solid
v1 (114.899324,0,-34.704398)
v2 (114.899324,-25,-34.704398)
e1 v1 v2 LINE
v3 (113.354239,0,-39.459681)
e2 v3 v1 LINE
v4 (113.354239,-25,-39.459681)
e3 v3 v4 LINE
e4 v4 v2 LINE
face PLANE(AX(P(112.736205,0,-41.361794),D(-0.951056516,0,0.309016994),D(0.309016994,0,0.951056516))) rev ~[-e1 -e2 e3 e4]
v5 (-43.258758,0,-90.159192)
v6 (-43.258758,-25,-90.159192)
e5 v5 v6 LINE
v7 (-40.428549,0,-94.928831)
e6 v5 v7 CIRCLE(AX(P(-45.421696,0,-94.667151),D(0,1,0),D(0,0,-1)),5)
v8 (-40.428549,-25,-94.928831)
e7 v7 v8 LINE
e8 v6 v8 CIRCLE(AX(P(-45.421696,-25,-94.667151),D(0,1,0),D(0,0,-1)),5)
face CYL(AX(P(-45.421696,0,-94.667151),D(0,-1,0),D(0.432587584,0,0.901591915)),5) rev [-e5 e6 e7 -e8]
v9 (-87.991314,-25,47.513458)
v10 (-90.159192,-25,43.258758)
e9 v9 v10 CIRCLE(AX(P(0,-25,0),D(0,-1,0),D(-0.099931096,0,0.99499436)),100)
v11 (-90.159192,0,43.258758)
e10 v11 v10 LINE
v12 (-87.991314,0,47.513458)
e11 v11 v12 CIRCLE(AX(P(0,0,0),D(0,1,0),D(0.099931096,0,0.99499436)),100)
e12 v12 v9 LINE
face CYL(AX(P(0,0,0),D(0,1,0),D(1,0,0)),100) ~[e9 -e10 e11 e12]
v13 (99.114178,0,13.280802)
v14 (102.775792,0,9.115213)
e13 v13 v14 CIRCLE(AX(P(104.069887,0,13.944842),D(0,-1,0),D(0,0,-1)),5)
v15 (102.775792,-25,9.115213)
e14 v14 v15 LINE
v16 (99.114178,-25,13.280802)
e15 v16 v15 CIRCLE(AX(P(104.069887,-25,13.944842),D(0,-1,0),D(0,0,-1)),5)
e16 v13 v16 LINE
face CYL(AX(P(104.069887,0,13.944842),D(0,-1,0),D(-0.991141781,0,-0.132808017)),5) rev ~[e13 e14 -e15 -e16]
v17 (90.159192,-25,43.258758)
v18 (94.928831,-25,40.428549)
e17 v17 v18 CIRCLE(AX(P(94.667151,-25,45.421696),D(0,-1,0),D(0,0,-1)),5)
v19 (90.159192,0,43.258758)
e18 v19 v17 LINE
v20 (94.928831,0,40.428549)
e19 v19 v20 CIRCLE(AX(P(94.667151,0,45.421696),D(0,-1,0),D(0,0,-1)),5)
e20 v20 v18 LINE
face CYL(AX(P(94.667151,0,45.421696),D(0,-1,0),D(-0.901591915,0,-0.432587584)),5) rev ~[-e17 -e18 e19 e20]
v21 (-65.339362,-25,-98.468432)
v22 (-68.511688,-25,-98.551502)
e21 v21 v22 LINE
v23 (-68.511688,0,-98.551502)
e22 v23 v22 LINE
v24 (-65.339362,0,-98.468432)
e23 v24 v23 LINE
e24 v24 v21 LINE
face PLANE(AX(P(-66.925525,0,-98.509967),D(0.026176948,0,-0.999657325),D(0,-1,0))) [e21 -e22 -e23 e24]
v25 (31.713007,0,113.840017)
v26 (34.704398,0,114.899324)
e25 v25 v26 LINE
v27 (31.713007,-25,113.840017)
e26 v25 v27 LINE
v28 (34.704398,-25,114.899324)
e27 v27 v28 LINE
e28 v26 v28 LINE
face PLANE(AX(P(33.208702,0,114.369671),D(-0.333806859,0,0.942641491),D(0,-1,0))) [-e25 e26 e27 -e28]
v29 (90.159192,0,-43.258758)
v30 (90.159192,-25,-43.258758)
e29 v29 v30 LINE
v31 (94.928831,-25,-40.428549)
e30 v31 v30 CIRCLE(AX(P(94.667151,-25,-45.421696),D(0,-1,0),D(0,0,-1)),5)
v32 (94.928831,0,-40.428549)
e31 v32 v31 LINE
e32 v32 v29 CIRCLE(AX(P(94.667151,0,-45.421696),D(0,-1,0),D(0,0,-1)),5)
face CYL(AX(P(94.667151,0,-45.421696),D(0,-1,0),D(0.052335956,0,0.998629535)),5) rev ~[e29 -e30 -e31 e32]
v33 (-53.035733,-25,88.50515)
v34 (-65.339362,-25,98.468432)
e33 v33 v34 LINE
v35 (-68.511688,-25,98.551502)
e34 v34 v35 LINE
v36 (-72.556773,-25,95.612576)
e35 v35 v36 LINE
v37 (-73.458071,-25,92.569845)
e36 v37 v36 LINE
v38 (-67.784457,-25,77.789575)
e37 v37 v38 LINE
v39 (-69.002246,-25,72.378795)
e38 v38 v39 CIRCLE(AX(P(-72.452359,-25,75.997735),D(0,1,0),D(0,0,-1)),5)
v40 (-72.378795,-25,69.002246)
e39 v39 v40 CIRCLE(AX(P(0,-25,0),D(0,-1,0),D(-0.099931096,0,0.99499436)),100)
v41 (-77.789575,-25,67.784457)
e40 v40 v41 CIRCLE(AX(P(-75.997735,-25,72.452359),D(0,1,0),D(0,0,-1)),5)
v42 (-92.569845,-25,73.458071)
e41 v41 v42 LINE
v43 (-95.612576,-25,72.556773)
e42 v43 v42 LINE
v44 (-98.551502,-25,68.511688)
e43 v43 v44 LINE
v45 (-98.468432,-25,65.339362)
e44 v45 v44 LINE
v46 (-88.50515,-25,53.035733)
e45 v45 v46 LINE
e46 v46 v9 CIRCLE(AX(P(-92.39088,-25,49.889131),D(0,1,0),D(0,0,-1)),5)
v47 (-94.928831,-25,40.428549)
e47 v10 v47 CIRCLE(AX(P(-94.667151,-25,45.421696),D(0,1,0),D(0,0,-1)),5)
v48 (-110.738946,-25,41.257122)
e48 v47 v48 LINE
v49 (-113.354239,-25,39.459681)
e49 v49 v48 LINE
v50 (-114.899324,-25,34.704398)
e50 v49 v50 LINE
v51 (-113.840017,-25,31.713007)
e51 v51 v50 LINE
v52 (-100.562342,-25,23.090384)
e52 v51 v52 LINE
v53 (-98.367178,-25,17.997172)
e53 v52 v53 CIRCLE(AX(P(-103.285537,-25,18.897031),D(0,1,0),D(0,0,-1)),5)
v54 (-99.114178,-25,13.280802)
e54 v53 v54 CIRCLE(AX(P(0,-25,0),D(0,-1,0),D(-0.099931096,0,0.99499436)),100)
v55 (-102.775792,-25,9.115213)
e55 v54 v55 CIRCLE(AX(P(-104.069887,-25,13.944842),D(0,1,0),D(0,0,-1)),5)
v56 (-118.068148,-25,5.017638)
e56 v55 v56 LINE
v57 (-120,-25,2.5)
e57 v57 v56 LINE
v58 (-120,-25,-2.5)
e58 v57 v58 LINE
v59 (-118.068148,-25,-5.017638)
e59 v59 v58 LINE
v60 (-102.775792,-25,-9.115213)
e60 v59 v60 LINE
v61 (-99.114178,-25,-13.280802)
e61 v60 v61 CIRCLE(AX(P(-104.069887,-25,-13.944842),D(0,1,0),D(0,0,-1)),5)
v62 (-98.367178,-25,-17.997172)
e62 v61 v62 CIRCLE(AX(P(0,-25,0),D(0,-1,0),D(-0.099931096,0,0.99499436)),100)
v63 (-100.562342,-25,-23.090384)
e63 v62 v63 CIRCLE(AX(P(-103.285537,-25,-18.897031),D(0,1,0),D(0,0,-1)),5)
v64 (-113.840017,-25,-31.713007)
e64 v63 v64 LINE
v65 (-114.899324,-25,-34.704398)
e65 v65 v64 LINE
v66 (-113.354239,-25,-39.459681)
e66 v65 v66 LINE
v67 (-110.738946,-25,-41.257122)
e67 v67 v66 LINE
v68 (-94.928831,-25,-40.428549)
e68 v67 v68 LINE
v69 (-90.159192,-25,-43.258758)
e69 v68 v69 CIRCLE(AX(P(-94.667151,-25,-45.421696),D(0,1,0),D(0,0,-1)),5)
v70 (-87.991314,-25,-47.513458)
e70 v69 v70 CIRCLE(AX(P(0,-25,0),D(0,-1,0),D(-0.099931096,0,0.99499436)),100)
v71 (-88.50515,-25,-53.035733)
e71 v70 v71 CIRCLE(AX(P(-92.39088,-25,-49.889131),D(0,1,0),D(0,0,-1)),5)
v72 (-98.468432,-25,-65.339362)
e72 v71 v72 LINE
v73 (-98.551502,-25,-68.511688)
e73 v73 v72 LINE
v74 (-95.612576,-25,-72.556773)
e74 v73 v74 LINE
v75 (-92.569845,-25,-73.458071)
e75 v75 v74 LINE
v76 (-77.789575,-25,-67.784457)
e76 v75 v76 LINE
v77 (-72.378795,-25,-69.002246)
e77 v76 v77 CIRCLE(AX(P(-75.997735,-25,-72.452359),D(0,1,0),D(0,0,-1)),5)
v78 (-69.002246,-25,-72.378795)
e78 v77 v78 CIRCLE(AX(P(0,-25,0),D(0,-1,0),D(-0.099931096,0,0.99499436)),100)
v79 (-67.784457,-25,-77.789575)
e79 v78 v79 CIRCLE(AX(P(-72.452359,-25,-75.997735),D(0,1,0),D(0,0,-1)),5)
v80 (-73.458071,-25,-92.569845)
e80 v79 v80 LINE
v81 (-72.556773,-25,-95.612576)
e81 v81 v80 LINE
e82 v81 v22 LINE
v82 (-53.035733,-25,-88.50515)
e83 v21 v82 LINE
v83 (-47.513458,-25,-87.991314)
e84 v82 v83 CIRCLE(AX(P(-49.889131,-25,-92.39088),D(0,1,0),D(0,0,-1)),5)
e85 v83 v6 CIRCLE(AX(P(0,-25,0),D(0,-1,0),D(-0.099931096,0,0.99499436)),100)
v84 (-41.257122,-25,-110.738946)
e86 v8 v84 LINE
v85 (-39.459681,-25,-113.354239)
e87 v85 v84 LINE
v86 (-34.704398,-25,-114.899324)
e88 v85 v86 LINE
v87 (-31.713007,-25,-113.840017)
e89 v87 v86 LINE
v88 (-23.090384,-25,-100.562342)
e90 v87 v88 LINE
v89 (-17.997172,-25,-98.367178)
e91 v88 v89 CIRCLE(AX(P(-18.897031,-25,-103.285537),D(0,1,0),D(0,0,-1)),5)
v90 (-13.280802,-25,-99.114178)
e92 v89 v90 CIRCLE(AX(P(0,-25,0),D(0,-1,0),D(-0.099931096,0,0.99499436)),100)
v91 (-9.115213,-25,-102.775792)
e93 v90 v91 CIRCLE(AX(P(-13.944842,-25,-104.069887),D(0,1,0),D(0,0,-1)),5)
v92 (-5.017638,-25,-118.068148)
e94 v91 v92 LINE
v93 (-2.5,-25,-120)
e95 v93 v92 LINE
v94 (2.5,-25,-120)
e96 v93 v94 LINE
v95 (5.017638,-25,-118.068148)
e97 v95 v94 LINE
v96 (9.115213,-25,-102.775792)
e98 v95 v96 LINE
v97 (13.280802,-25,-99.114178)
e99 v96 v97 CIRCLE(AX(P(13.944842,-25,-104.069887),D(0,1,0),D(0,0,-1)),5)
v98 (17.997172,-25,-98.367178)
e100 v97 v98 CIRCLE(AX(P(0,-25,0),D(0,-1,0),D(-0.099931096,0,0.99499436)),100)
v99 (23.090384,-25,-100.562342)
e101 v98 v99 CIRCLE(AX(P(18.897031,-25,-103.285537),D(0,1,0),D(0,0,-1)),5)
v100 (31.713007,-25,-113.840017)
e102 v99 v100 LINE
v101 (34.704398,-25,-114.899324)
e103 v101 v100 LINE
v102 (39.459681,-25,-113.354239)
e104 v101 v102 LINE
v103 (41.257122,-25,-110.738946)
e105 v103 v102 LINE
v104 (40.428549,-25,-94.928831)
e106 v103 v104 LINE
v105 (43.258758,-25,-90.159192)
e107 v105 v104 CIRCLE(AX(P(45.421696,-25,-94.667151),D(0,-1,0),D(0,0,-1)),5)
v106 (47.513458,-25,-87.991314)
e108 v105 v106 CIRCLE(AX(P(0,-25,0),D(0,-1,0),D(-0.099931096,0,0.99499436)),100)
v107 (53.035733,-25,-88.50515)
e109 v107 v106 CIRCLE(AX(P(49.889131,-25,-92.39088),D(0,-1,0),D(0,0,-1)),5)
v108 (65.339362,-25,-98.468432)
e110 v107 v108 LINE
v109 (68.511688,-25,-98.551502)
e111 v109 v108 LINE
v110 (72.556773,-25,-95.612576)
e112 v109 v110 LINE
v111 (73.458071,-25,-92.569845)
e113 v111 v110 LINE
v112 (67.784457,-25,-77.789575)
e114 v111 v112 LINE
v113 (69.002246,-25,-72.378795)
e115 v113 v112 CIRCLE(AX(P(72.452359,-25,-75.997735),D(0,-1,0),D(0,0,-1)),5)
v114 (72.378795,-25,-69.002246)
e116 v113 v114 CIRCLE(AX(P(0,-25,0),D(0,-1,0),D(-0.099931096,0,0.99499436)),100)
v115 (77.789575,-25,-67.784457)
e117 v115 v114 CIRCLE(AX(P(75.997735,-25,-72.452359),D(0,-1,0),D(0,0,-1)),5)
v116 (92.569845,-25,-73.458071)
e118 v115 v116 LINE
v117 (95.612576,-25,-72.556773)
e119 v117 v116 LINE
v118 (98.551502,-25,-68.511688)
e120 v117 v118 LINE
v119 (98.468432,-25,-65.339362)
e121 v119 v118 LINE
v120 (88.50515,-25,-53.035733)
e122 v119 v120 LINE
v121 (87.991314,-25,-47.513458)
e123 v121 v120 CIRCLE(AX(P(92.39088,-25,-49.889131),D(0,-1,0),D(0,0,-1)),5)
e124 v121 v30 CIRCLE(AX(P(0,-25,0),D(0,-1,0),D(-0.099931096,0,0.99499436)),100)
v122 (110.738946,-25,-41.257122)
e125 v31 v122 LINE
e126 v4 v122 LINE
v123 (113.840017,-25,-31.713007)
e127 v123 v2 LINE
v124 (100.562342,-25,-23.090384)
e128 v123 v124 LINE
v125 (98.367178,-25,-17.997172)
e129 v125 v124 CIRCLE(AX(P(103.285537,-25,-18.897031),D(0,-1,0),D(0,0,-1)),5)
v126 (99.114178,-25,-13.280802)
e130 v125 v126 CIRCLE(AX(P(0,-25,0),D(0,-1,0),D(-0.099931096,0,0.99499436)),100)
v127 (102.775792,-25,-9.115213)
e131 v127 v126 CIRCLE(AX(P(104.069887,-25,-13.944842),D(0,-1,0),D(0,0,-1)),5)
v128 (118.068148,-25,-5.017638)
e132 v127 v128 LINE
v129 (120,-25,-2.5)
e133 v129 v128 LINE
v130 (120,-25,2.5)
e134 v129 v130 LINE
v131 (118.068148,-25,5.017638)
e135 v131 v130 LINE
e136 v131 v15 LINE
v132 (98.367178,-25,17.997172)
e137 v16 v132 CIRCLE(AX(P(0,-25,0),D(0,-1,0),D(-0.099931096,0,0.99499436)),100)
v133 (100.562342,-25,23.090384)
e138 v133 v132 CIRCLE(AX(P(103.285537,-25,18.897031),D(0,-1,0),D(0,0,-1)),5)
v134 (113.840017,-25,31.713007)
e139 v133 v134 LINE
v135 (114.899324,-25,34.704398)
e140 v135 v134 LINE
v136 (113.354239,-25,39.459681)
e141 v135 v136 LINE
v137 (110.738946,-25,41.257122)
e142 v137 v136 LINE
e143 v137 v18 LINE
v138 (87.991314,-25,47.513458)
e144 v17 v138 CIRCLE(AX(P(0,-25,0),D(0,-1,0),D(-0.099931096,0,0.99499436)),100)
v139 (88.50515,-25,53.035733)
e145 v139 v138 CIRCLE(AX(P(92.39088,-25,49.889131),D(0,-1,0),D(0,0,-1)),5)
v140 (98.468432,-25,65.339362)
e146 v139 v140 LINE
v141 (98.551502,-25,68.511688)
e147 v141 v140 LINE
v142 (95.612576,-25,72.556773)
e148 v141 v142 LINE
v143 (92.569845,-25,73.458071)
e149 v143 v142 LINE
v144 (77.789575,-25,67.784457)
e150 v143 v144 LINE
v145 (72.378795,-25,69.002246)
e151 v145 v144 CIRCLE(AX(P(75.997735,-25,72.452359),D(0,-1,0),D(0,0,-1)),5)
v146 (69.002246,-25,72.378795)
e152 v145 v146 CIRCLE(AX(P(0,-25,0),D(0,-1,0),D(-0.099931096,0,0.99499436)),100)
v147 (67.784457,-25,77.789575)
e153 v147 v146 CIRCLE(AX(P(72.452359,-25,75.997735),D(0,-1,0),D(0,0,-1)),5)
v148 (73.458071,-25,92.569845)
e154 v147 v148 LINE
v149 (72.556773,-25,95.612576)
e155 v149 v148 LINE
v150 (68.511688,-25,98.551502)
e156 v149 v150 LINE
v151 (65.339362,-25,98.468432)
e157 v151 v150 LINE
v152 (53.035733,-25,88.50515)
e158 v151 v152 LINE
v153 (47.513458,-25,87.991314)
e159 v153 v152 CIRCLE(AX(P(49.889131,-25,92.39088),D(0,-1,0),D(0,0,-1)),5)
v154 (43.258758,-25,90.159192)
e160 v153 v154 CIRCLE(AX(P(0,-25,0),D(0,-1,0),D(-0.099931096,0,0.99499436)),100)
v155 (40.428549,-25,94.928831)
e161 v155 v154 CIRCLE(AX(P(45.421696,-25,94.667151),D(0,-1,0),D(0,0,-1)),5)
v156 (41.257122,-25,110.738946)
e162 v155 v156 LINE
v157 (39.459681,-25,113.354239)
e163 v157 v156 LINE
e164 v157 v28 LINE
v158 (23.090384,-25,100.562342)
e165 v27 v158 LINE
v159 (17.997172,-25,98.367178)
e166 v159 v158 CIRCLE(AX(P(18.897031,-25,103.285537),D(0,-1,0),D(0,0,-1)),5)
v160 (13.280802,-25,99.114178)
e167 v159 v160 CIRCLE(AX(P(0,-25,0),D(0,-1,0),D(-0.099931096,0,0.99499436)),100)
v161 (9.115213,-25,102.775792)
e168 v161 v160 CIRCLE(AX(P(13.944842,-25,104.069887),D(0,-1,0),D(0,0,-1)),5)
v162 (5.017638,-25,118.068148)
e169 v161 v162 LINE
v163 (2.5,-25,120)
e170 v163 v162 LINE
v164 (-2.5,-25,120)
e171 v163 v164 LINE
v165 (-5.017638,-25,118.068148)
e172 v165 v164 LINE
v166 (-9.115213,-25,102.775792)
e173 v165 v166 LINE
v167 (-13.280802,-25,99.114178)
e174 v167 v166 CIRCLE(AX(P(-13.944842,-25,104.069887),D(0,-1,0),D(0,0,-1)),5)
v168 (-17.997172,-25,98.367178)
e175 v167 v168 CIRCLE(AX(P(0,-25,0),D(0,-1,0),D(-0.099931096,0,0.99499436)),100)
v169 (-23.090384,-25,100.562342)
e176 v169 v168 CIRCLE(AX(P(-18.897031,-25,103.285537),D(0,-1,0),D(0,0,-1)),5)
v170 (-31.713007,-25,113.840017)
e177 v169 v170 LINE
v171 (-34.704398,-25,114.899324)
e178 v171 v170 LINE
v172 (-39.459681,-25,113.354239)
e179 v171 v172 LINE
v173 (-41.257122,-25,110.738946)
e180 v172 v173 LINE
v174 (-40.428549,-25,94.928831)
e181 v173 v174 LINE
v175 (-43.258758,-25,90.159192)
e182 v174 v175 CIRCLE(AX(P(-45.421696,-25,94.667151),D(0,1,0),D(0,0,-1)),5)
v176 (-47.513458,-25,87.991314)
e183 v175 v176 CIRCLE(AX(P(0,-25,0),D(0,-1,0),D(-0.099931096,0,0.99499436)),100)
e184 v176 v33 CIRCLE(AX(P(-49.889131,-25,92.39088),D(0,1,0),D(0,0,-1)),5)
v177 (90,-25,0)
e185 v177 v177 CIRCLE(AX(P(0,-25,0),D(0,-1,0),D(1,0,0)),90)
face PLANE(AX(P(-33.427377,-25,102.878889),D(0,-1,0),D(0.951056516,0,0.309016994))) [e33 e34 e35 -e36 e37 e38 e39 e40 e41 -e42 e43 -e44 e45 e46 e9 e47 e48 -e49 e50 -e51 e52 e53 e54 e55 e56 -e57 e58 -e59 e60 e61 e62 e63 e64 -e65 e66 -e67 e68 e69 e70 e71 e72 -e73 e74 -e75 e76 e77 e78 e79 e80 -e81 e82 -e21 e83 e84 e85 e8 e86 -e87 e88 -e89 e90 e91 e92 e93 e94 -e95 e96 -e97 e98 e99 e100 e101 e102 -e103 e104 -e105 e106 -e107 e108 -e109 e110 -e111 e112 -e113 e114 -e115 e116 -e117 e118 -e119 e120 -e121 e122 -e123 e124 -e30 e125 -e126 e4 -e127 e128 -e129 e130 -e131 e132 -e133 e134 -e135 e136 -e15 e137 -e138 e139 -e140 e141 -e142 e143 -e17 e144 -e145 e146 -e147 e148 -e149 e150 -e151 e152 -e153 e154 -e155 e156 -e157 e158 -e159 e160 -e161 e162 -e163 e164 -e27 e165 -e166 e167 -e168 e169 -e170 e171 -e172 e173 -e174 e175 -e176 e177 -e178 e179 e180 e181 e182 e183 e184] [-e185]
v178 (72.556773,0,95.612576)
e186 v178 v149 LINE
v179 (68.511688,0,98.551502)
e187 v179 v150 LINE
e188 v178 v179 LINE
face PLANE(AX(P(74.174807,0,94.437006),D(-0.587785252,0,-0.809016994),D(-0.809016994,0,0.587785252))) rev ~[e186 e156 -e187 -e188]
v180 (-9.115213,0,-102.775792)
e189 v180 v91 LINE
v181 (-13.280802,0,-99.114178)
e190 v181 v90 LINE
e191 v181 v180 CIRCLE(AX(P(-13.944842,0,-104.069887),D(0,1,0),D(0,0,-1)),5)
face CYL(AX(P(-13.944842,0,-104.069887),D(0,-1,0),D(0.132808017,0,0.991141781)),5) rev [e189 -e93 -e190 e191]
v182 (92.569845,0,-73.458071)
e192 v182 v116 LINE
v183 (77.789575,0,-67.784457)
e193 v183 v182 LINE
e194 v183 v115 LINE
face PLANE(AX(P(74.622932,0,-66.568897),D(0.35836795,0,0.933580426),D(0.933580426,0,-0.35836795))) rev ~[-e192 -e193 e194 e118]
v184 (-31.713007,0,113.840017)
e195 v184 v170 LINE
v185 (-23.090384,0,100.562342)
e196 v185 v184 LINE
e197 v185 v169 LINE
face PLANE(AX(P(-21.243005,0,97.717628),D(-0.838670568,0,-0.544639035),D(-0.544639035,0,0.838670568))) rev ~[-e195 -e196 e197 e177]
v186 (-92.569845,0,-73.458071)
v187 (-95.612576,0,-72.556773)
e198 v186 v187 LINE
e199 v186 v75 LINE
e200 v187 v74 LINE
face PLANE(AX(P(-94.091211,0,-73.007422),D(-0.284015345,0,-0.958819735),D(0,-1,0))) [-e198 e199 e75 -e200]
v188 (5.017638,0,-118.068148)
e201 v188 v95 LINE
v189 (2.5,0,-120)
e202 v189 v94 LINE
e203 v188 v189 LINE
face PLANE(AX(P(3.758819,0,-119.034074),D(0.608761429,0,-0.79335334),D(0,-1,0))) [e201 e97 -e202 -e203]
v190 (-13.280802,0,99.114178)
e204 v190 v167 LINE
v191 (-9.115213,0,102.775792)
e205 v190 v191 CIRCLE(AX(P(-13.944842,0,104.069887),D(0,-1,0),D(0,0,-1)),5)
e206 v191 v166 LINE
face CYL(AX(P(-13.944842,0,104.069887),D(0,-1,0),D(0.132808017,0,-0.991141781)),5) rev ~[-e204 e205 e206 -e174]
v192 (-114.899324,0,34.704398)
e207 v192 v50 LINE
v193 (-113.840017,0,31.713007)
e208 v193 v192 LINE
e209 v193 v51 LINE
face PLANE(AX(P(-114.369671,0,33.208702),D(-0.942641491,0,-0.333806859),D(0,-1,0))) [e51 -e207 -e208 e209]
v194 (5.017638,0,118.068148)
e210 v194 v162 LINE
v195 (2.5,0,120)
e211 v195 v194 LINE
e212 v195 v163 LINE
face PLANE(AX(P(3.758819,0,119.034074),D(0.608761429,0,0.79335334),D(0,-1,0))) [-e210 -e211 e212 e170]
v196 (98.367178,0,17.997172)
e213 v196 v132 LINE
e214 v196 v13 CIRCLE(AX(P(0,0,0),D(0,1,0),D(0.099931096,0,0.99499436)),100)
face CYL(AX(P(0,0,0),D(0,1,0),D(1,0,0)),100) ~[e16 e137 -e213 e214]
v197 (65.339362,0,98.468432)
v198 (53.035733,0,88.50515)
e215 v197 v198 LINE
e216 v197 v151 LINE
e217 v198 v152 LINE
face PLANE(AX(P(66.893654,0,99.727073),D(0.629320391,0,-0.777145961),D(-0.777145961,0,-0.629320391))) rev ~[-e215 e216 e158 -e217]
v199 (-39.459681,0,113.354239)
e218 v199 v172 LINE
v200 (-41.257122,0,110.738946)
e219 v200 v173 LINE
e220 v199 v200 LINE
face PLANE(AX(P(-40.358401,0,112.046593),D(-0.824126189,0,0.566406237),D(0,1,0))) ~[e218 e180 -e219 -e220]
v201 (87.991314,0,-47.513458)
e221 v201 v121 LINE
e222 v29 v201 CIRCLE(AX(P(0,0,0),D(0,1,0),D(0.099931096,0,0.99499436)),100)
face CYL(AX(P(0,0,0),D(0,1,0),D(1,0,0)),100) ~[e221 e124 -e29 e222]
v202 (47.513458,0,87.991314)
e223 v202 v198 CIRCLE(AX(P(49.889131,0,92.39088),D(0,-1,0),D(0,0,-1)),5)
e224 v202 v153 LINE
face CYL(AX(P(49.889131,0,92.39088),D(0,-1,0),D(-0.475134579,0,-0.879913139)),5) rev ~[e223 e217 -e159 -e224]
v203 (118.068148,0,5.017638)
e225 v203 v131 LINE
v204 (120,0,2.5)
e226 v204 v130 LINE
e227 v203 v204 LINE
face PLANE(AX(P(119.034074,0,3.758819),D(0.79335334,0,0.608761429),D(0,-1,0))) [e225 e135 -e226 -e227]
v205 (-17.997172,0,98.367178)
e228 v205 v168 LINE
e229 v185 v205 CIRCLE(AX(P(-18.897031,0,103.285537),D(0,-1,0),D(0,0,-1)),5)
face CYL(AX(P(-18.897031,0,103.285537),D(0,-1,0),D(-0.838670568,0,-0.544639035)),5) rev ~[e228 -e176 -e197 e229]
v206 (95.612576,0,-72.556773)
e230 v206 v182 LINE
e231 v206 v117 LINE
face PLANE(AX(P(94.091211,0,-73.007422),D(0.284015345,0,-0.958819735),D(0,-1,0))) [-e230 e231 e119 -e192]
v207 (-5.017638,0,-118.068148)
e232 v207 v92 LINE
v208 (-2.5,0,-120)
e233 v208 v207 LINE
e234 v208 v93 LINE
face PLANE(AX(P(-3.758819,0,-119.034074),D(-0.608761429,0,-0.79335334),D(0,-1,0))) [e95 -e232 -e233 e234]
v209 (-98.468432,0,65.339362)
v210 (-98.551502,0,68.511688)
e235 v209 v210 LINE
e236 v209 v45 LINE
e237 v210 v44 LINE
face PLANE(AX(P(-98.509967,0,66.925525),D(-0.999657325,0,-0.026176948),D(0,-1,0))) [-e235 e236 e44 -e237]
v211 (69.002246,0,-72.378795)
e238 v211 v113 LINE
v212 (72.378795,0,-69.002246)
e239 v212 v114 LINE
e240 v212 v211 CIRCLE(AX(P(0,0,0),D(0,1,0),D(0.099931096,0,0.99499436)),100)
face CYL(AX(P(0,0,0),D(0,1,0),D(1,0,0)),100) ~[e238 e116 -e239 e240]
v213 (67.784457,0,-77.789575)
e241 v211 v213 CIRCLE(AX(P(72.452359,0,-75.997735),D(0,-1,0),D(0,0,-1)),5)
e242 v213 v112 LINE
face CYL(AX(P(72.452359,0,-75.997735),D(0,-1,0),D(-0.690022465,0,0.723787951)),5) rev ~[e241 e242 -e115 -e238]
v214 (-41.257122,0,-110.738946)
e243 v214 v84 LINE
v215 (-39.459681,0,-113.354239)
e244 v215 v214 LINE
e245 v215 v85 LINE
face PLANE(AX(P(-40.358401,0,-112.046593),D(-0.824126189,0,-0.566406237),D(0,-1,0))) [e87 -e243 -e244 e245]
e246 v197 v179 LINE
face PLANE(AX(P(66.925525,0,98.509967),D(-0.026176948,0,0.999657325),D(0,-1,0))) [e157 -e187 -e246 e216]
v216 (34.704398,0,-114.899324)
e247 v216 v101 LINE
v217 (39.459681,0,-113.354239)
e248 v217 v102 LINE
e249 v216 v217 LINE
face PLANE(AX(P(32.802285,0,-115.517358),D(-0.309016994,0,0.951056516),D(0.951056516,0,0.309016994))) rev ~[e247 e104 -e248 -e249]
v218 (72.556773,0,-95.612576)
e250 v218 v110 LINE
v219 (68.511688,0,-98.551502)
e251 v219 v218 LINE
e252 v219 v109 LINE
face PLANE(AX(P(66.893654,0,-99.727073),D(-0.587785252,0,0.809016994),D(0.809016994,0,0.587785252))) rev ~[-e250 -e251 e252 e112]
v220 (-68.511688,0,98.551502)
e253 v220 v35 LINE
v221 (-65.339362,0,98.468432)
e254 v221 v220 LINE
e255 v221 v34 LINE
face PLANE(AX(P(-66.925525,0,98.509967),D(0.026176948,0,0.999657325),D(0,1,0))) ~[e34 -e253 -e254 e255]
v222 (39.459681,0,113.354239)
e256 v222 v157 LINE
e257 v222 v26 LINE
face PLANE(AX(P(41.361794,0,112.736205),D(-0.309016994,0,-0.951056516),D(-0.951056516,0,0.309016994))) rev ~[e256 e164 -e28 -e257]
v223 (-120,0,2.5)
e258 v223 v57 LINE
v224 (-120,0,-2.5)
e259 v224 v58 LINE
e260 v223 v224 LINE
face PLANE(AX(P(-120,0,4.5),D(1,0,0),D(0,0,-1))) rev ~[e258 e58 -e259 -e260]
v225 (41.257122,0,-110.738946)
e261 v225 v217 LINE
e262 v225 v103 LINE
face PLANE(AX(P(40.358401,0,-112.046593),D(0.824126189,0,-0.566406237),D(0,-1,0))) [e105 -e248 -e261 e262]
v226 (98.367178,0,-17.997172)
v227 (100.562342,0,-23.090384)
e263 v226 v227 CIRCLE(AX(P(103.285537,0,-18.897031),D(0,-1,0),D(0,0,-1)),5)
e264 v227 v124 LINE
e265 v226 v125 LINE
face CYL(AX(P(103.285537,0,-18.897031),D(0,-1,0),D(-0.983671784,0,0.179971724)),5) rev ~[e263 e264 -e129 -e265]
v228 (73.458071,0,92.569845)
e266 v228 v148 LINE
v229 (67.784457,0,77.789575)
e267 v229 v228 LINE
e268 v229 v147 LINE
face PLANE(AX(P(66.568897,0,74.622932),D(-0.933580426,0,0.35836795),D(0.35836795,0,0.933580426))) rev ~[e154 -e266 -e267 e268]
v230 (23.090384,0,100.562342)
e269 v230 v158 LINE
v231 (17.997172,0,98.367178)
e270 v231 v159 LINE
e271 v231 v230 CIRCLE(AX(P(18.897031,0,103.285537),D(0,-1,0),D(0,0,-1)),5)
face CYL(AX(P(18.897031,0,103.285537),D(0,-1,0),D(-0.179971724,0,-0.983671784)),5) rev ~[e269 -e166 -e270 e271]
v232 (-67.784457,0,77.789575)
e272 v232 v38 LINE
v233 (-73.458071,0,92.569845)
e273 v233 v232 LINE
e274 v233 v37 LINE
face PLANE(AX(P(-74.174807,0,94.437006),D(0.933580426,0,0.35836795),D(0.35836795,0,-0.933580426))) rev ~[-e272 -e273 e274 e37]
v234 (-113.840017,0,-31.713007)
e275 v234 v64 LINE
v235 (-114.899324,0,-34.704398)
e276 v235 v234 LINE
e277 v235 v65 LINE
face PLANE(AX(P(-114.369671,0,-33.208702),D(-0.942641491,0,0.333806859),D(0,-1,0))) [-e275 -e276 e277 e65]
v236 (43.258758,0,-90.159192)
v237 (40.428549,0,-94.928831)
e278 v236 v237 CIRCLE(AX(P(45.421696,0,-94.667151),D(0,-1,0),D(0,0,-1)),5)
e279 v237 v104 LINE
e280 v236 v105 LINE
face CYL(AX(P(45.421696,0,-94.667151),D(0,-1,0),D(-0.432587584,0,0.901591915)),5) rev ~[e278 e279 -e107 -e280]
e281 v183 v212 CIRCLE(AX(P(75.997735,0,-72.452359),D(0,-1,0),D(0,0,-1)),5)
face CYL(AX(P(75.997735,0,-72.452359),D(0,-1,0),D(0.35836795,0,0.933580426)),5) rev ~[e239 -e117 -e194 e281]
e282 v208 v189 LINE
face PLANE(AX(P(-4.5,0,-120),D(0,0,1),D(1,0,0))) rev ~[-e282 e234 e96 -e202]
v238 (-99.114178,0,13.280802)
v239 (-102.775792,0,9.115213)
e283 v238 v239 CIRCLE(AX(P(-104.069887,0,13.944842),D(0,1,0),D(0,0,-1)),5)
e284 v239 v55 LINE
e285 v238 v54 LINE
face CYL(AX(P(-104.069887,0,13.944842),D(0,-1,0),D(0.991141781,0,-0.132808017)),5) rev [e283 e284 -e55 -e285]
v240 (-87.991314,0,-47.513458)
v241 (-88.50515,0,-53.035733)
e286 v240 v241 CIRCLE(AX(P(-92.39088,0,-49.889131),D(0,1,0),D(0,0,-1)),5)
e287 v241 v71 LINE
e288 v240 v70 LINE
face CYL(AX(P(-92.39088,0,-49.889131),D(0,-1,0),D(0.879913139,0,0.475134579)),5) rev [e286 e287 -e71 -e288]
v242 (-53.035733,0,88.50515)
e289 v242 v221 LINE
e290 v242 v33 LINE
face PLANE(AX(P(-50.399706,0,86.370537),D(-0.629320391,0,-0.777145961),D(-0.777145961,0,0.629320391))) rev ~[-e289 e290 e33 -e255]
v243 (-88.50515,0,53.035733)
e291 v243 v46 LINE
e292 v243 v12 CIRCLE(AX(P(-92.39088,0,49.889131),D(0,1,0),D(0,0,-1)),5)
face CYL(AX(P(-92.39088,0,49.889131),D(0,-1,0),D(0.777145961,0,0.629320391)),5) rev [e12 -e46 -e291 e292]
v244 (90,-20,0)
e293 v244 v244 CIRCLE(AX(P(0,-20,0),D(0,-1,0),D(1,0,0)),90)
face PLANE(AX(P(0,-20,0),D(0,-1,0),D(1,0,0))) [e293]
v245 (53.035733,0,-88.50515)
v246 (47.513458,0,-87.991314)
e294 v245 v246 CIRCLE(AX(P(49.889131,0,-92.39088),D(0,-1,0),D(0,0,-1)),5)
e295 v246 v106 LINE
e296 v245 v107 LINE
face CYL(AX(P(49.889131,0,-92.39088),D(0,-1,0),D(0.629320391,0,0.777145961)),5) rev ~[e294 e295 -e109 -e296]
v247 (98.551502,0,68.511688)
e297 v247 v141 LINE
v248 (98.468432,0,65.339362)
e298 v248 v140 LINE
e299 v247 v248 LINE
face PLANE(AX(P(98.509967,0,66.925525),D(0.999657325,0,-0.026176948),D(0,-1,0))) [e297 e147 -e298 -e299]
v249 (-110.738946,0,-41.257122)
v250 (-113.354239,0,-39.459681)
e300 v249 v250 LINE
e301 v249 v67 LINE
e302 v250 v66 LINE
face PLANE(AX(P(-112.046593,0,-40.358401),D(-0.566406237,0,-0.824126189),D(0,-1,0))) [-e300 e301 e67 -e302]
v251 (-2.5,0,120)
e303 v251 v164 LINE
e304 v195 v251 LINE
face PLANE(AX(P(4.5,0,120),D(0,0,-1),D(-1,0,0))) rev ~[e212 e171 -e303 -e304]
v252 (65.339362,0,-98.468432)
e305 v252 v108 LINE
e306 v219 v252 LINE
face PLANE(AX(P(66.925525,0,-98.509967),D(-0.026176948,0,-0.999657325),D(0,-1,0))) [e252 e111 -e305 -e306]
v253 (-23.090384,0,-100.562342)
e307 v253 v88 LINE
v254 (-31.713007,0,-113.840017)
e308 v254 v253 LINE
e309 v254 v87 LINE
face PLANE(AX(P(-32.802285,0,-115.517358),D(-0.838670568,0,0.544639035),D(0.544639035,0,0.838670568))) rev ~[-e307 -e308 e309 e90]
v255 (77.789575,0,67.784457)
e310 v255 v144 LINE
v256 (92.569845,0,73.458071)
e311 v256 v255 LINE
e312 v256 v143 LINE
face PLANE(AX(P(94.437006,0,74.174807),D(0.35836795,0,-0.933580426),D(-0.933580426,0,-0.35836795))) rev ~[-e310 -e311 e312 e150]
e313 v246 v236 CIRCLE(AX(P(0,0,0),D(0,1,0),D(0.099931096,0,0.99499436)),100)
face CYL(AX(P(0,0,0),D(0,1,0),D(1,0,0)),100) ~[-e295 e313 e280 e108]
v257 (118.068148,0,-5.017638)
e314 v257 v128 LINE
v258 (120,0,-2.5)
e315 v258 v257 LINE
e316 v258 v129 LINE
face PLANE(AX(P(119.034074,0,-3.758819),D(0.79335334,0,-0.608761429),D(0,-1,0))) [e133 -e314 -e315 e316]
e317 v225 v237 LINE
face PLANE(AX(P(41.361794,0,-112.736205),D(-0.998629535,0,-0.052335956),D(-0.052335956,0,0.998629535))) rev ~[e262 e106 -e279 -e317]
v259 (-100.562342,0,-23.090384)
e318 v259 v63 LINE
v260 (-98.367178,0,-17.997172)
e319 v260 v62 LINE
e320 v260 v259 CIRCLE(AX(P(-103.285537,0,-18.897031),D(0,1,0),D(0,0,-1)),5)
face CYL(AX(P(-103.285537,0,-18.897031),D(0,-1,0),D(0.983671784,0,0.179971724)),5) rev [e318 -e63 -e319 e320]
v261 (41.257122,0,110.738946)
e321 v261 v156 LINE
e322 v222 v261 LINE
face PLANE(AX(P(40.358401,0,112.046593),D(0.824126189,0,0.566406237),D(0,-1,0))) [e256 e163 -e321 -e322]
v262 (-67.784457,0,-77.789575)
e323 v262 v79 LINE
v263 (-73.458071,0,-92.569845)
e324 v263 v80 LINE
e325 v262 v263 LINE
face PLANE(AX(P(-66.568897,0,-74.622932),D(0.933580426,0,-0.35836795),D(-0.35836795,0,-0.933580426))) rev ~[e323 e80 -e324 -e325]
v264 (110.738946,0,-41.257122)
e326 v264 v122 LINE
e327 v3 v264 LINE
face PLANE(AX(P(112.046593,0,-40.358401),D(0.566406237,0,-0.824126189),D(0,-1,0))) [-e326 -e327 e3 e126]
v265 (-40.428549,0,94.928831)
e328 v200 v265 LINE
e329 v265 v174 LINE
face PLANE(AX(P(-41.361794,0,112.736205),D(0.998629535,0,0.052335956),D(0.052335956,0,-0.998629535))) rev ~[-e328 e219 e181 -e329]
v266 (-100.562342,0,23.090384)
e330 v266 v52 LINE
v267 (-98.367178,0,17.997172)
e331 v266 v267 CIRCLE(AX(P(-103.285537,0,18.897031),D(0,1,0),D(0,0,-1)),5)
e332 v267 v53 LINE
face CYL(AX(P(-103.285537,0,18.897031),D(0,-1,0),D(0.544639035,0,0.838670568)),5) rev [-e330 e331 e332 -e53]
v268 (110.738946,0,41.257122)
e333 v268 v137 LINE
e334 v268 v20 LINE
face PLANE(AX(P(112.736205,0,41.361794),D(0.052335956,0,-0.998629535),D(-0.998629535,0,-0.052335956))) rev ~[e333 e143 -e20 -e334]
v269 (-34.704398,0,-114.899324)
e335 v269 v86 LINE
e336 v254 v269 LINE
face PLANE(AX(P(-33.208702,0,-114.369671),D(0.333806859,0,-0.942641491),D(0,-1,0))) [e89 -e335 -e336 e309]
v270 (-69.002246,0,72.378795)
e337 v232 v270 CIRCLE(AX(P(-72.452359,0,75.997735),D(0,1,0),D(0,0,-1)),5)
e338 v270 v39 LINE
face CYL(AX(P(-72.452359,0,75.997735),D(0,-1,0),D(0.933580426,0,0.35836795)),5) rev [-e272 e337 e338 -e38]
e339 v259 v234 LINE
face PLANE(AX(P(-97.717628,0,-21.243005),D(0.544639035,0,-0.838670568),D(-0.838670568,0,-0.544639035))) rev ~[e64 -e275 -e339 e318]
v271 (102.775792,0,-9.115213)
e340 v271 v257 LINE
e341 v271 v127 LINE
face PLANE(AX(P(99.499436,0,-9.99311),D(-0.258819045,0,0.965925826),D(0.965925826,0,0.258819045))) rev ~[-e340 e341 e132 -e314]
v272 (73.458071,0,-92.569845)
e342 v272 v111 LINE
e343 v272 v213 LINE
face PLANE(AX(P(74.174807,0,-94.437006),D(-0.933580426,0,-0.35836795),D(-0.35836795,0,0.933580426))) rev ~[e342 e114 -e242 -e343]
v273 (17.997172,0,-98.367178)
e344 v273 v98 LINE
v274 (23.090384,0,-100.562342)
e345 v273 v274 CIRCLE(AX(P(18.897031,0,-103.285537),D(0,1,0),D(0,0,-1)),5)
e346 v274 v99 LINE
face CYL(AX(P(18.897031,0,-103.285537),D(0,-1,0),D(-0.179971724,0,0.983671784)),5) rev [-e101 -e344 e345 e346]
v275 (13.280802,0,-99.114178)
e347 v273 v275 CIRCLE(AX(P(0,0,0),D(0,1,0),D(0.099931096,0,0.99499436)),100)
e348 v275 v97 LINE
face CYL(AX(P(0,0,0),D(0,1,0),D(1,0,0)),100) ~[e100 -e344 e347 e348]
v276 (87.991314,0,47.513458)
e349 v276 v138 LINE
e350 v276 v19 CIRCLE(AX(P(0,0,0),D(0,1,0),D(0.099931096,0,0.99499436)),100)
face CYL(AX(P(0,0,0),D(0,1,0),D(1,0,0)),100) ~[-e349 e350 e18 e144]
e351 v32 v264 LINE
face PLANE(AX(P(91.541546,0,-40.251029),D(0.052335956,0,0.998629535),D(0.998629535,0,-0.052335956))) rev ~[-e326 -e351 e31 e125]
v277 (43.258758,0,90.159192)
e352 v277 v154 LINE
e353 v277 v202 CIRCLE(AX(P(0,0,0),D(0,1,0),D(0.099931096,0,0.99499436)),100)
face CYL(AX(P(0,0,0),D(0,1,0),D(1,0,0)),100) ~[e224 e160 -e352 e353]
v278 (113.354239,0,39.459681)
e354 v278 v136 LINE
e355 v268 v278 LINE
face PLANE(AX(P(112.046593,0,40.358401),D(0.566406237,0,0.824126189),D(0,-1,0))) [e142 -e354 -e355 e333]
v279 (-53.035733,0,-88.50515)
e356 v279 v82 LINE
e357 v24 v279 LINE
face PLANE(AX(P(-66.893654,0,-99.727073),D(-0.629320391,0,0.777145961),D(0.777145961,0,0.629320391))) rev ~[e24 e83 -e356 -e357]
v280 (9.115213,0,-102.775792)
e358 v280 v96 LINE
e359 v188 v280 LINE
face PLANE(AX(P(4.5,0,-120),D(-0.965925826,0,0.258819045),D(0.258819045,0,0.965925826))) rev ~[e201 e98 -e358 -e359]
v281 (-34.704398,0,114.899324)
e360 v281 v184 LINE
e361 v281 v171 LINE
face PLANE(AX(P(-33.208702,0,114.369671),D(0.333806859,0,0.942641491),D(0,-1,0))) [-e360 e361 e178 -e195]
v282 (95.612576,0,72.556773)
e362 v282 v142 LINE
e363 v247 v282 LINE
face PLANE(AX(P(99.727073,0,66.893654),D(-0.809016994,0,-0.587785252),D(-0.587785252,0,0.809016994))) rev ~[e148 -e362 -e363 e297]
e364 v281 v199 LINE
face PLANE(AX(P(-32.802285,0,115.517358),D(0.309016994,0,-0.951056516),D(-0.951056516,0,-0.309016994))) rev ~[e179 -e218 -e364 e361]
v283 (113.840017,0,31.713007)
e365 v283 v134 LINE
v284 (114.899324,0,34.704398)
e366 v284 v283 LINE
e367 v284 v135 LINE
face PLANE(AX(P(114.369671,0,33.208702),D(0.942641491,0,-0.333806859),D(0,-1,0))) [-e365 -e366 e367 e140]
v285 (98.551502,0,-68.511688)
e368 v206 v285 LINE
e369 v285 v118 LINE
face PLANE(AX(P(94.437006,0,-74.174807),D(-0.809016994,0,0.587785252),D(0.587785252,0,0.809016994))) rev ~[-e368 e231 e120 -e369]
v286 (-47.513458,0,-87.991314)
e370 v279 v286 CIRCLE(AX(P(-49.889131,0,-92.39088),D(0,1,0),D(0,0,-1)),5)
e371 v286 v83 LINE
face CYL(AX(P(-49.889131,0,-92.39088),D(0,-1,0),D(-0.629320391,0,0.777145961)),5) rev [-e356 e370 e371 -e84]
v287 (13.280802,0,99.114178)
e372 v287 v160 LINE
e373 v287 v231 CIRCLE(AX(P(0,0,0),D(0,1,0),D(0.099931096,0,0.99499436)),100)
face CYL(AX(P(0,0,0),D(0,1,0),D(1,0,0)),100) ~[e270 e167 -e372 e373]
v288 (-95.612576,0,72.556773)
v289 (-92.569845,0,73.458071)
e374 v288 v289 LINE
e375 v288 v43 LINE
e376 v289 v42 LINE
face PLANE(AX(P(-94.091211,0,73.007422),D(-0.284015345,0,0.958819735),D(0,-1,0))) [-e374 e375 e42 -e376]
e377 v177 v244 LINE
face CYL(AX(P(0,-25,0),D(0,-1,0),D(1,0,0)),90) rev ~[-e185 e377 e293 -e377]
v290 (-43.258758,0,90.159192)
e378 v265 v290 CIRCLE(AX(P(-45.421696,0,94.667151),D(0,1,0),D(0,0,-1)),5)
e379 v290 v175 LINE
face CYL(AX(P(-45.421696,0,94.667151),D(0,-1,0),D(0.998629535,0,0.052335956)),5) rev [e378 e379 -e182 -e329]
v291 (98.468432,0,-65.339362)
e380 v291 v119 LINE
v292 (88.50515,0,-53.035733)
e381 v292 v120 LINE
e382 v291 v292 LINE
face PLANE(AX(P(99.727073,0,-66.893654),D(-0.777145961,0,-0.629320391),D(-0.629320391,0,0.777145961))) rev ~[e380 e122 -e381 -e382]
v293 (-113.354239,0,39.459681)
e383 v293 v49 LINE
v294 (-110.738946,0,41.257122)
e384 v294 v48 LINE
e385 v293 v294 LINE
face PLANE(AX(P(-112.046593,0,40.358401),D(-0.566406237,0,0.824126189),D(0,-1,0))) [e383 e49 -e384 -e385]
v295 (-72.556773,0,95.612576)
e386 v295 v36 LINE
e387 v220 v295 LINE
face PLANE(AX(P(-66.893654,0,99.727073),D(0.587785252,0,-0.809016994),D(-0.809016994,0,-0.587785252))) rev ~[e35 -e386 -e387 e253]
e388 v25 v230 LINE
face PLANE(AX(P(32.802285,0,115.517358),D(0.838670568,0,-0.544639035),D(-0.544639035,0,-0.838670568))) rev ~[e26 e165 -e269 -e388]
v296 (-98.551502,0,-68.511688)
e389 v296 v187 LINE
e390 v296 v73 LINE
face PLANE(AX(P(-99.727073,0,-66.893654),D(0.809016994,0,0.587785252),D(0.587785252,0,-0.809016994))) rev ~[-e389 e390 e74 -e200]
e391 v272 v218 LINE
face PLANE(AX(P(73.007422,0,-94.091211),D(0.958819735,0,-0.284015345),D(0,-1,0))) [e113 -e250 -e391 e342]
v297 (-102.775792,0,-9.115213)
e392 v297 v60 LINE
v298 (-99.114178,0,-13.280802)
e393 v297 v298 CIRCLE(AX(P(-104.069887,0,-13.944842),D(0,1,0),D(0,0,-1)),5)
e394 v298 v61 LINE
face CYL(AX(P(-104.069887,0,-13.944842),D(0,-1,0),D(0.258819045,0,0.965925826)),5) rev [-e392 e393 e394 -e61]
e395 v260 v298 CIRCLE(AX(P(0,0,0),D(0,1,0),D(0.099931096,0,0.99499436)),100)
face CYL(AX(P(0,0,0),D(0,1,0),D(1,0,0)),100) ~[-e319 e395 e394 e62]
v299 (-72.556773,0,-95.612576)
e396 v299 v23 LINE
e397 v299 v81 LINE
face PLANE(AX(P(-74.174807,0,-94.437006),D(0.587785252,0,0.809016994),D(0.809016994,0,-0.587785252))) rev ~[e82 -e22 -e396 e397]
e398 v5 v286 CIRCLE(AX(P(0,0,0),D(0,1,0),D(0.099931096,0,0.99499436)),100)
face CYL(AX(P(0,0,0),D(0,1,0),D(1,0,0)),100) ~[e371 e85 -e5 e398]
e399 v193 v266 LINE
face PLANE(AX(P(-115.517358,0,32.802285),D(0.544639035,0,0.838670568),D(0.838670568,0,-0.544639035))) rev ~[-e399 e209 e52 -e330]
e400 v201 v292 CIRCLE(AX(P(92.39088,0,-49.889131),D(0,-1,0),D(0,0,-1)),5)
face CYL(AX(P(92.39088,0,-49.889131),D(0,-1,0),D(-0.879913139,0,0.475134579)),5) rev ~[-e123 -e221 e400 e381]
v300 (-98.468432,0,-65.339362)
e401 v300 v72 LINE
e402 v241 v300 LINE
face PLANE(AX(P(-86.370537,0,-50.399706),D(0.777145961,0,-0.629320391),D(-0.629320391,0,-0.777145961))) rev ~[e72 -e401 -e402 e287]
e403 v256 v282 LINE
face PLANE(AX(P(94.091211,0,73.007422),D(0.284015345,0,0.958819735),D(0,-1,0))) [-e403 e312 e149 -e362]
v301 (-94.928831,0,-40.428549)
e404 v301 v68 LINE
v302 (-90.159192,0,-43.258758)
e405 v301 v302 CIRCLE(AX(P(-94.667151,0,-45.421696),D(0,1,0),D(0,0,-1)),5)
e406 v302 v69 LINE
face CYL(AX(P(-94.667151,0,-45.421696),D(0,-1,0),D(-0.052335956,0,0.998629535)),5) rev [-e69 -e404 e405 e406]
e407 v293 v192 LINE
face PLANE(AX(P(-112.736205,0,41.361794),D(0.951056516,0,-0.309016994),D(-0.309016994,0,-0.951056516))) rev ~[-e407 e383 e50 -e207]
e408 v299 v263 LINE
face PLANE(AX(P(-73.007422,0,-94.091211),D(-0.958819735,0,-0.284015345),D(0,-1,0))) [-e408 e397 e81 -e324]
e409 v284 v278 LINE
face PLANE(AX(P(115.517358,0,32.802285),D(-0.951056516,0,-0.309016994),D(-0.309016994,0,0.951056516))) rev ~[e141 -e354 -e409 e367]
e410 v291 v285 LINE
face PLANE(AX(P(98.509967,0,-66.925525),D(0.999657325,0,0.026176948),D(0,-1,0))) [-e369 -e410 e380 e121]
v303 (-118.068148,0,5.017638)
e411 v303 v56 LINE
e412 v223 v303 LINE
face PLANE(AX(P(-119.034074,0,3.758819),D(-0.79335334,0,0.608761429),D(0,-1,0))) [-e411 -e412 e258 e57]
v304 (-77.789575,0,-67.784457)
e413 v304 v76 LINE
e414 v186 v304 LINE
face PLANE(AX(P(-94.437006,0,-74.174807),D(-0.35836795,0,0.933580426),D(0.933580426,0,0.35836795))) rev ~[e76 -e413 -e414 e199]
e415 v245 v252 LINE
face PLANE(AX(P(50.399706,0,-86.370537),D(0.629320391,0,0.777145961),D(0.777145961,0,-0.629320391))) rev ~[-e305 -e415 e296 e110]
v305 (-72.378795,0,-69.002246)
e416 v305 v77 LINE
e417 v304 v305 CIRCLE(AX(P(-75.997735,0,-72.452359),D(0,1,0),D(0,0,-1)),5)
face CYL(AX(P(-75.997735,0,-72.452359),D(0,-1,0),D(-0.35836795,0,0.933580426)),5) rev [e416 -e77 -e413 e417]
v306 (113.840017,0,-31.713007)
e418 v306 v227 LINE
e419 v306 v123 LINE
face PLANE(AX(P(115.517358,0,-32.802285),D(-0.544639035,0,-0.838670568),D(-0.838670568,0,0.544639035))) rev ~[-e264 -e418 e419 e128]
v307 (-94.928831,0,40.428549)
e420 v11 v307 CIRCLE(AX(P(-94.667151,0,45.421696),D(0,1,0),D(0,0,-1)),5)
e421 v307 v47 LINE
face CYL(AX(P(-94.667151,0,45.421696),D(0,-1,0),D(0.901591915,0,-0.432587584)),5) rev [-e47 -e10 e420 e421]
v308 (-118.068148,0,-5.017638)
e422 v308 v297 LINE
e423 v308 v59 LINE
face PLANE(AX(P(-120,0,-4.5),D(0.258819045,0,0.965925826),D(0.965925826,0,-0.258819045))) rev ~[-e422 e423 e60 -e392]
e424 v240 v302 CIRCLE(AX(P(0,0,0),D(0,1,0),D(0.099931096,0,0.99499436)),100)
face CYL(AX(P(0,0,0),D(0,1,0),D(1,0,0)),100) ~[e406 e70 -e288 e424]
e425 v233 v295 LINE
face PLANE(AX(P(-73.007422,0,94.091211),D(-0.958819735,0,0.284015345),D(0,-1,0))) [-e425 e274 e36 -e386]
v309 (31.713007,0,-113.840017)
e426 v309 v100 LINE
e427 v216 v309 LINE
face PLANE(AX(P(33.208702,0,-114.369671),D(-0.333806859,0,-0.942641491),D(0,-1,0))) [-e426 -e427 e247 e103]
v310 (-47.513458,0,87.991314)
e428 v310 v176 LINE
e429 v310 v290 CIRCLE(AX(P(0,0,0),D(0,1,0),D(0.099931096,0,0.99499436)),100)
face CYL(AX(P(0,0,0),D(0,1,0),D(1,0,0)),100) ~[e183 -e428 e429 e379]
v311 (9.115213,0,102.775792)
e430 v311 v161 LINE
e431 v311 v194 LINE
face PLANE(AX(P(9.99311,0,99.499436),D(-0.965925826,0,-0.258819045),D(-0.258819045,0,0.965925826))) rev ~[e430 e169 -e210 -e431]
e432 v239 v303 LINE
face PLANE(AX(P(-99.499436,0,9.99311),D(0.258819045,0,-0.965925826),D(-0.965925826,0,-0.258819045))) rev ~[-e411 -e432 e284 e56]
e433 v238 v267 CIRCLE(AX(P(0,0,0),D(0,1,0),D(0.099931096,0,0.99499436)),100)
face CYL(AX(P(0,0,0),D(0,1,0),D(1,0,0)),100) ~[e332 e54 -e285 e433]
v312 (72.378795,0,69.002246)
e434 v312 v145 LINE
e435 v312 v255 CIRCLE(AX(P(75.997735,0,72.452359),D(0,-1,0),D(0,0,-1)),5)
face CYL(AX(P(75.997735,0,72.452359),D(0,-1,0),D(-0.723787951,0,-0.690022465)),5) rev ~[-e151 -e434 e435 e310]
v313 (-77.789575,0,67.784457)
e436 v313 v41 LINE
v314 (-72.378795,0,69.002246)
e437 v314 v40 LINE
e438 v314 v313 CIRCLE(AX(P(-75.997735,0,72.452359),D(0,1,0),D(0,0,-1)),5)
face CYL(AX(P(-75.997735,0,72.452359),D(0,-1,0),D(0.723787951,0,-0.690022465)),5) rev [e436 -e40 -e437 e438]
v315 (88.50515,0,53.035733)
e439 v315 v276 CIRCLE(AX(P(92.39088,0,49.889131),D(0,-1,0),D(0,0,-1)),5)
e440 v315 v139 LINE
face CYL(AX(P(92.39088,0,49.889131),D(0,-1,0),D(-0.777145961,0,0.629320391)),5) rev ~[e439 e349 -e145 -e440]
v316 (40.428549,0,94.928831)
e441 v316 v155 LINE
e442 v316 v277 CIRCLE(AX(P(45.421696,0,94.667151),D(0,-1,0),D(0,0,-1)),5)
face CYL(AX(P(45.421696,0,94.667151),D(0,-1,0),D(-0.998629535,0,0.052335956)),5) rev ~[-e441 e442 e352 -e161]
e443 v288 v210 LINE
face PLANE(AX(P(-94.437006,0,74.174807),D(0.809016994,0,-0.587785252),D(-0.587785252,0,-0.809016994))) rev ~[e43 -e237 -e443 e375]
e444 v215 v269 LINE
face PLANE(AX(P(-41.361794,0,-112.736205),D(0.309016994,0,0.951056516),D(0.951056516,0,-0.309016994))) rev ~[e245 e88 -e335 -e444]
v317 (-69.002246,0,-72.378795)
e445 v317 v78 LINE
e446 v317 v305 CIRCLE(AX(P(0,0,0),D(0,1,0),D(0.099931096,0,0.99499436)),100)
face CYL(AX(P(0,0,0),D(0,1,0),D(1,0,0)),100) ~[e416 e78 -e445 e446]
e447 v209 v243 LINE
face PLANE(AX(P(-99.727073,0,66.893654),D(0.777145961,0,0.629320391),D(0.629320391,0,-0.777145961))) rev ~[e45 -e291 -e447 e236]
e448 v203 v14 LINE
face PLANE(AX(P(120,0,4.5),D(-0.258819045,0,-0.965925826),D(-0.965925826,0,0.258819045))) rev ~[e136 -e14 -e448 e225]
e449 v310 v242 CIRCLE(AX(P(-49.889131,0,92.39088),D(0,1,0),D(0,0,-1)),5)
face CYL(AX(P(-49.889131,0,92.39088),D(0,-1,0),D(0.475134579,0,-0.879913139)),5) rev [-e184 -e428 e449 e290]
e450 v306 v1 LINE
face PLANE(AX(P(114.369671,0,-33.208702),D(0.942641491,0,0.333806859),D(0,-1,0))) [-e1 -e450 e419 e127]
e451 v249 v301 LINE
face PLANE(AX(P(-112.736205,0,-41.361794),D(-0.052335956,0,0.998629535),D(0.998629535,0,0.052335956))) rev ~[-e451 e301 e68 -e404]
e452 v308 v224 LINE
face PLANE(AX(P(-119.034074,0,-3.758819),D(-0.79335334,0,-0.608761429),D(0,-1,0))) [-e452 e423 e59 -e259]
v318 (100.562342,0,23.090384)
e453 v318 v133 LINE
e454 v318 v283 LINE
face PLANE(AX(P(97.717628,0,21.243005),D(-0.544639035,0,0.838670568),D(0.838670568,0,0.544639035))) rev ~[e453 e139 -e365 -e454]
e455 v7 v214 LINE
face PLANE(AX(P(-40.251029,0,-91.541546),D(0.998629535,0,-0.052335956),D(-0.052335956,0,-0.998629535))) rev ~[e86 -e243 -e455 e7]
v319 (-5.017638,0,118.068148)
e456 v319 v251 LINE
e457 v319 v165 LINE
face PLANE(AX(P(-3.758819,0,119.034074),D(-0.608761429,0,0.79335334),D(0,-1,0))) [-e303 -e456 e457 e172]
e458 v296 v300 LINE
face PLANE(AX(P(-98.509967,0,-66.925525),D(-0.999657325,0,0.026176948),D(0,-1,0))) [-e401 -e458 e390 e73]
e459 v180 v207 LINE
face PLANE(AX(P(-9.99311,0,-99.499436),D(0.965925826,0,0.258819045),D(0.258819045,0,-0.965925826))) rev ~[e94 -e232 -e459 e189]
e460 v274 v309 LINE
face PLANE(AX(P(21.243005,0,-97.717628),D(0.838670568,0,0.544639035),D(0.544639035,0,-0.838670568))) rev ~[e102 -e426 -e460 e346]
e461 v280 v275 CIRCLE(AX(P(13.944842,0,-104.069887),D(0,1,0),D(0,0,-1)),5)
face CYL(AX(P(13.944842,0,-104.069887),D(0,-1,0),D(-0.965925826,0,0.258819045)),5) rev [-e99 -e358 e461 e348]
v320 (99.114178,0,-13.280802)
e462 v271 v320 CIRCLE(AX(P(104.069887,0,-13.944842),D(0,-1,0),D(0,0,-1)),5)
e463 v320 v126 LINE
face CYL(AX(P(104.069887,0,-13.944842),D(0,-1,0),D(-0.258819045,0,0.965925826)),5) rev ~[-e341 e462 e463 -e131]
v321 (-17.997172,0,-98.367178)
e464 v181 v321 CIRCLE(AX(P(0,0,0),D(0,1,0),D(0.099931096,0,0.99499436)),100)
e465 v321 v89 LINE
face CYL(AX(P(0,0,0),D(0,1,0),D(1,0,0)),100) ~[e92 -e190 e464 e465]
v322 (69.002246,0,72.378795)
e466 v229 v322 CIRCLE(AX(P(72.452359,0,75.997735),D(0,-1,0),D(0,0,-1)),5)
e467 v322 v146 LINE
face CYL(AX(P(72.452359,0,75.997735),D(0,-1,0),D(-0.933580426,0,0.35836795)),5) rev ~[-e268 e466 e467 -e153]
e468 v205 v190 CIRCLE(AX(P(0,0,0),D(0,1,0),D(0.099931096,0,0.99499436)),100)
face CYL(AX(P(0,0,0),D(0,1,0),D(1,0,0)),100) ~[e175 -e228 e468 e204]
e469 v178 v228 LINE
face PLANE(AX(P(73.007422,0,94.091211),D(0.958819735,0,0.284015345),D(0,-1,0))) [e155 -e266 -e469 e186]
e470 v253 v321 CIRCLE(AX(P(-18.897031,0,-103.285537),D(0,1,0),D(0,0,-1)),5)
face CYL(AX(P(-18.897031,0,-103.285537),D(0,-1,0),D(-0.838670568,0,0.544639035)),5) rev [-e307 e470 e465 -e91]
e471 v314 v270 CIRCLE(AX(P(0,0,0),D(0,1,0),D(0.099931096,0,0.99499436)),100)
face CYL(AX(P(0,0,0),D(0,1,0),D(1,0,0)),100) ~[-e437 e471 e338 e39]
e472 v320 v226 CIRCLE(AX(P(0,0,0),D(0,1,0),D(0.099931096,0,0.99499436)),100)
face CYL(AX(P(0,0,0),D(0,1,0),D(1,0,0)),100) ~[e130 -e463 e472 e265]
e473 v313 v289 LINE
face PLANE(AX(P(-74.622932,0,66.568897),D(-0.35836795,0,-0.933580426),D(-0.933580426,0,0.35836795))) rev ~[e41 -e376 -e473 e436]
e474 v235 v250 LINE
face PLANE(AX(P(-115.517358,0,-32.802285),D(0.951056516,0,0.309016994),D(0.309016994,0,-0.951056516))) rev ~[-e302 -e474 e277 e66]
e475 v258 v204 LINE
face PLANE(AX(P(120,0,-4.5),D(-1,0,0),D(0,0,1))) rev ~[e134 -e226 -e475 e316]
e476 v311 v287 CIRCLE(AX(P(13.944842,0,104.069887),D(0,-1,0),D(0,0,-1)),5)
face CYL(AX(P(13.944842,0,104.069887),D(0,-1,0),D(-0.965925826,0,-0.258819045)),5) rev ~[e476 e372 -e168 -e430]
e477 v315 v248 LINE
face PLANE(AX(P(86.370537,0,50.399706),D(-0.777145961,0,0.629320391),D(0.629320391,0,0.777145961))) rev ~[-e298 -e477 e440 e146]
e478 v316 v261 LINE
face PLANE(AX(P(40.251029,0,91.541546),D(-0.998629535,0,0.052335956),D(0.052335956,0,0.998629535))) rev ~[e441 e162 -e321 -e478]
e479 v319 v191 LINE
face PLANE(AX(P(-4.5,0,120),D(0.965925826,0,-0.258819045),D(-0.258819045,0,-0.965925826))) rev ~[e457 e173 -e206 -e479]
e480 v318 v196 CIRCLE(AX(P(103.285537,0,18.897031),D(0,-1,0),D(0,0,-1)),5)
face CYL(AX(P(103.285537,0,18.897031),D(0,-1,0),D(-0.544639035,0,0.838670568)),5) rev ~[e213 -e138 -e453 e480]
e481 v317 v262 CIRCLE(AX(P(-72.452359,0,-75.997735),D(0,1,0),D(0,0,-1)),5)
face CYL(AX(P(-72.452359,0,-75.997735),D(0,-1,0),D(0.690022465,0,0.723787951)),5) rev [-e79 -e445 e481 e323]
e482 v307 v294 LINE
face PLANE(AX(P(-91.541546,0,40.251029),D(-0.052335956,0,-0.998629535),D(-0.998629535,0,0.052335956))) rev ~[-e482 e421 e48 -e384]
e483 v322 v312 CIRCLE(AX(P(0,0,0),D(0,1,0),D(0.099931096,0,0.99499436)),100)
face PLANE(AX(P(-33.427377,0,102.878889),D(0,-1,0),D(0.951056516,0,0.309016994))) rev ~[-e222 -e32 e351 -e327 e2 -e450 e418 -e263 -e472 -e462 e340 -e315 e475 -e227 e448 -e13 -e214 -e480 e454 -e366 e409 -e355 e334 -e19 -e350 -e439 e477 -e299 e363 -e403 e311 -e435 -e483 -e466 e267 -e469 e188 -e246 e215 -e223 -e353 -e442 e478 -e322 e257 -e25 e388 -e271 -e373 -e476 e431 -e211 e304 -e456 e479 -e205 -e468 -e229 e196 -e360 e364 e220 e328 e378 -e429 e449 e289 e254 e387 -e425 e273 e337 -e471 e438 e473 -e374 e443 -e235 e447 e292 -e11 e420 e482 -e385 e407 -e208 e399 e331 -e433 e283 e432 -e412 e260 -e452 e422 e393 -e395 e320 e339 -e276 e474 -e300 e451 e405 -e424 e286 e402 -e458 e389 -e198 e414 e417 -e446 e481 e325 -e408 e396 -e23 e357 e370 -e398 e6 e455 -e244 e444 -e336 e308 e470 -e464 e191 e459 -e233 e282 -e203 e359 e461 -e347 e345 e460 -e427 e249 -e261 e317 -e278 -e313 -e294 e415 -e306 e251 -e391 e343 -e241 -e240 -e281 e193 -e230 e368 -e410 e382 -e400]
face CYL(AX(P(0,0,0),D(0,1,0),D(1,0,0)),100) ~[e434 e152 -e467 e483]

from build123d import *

# Parameters (mm, degrees)
F0_R            = 100
F1_DEPTH        = 25
F3_DEPTH        = 25
F3_COPIES_COUNT = 20
F4_SIZE         = 2
F5_R            = 5
F6_R            = 90
F7_DEPTH        = 5


# Not quite as in the source:
# - a pattern or mirror of a feature is missing from the dataset's text; its kind, count and spacing are read off the source's solid


with BuildPart() as f1:
    # F0 (on Front) → F1 (new body)
    with BuildSketch(Plane.XZ):
        Circle(F0_R)
    extrude(amount=F1_DEPTH)

    # F2 (on Front) → F3 (join)
    with BuildSketch(Plane.XZ):
        Polygon((4.5, 120), (-4.5, 120), (-9.9931095726, 99.4994359837), (9.9931095726, 99.4994359837), align=None)
    f3 = extrude(amount=F3_DEPTH)

    # F3_copies: F3 ×20 about axis
    f3_copies_axis = Axis((0, 0, 0), (0, 1, 0))
    for i in range(1, F3_COPIES_COUNT):
        add(f3.rotate(f3_copies_axis, i * 360 / F3_COPIES_COUNT))

    # F4
    f4_edges = [f1.edges().sort_by_distance(p)[0] for p in [
        (4.5, -12.5, 120),
        (-4.5, -12.5, 120),
        (-32.802285, -12.5, 115.517358),
        (115.517358, -12.5, 32.802285),
        (120, -12.5, 4.5),
        (120, -12.5, -4.5),
        (115.517358, -12.5, -32.802285),
        (112.736205, -12.5, -41.361794),
        (99.727073, -12.5, -66.893654),
        (94.437006, -12.5, -74.174807),
        (74.174807, -12.5, -94.437006),
        (66.893654, -12.5, -99.727073),
        (41.361794, -12.5, -112.736205),
        (32.802285, -12.5, -115.517358),
        (4.5, -12.5, -120),
        (-4.5, -12.5, -120),
        (-32.802285, -12.5, -115.517358),
        (-41.361794, -12.5, -112.736205),
        (-66.893654, -12.5, -99.727073),
        (-74.174807, -12.5, -94.437006),
        (-94.437006, -12.5, -74.174807),
        (-99.727073, -12.5, -66.893654),
        (-112.736205, -12.5, -41.361794),
        (-115.517358, -12.5, -32.802285),
        (-120, -12.5, -4.5),
        (-120, -12.5, 4.5),
        (-115.517358, -12.5, 32.802285),
        (-112.736205, -12.5, 41.361794),
        (-99.727073, -12.5, 66.893654),
        (-94.437006, -12.5, 74.174807),
        (-74.174807, -12.5, 94.437006),
        (-66.893654, -12.5, 99.727073),
        (32.802285, -12.5, 115.517358),
        (41.361794, -12.5, 112.736205),
        (66.893654, -12.5, 99.727073),
        (74.174807, -12.5, 94.437006),
        (94.437006, -12.5, 74.174807),
        (99.727073, -12.5, 66.893654),
        (112.736205, -12.5, 41.361794),
        (-41.361794, -12.5, 112.736205),
    ]]
    chamfer(f4_edges, length=F4_SIZE)

    # F5
    f5_edges = [f1.edges().sort_by_distance(p)[0] for p in [
        (9.99311, -12.5, 99.499436),
        (-9.99311, -12.5, 99.499436),
        (97.717628, -12.5, 21.243005),
        (99.499436, -12.5, 9.99311),
        (91.541546, -12.5, 40.251029),
        (86.370537, -12.5, 50.399706),
        (99.499436, -12.5, -9.99311),
        (97.717628, -12.5, -21.243005),
        (74.622932, -12.5, 66.568897),
        (66.568897, -12.5, 74.622932),
        (91.541546, -12.5, -40.251029),
        (86.370537, -12.5, -50.399706),
        (50.399706, -12.5, 86.370537),
        (40.251029, -12.5, 91.541546),
        (74.622932, -12.5, -66.568897),
        (66.568897, -12.5, -74.622932),
        (21.243005, -12.5, 97.717628),
        (50.399706, -12.5, -86.370537),
        (40.251029, -12.5, -91.541546),
        (-21.243005, -12.5, 97.717628),
        (21.243005, -12.5, -97.717628),
        (9.99311, -12.5, -99.499436),
        (-40.251029, -12.5, 91.541546),
        (-50.399706, -12.5, 86.370537),
        (-9.99311, -12.5, -99.499436),
        (-21.243005, -12.5, -97.717628),
        (-66.568897, -12.5, 74.622932),
        (-74.622932, -12.5, 66.568897),
        (-40.251029, -12.5, -91.541546),
        (-50.399706, -12.5, -86.370537),
        (-86.370537, -12.5, 50.399706),
        (-91.541546, -12.5, 40.251029),
        (-66.568897, -12.5, -74.622932),
        (-74.622932, -12.5, -66.568897),
        (-97.717628, -12.5, 21.243005),
        (-99.499436, -12.5, 9.99311),
        (-86.370537, -12.5, -50.399706),
        (-91.541546, -12.5, -40.251029),
        (-99.499436, -12.5, -9.99311),
        (-97.717628, -12.5, -21.243005),
    ]]
    fillet(f5_edges, radius=F5_R)

    # F6 (on face) → F7 (cut)
    with BuildSketch(Plane.XZ.offset(25)):
        Circle(F6_R)
    extrude(amount=-F7_DEPTH, mode=Mode.SUBTRACT)


solid = f1.part
